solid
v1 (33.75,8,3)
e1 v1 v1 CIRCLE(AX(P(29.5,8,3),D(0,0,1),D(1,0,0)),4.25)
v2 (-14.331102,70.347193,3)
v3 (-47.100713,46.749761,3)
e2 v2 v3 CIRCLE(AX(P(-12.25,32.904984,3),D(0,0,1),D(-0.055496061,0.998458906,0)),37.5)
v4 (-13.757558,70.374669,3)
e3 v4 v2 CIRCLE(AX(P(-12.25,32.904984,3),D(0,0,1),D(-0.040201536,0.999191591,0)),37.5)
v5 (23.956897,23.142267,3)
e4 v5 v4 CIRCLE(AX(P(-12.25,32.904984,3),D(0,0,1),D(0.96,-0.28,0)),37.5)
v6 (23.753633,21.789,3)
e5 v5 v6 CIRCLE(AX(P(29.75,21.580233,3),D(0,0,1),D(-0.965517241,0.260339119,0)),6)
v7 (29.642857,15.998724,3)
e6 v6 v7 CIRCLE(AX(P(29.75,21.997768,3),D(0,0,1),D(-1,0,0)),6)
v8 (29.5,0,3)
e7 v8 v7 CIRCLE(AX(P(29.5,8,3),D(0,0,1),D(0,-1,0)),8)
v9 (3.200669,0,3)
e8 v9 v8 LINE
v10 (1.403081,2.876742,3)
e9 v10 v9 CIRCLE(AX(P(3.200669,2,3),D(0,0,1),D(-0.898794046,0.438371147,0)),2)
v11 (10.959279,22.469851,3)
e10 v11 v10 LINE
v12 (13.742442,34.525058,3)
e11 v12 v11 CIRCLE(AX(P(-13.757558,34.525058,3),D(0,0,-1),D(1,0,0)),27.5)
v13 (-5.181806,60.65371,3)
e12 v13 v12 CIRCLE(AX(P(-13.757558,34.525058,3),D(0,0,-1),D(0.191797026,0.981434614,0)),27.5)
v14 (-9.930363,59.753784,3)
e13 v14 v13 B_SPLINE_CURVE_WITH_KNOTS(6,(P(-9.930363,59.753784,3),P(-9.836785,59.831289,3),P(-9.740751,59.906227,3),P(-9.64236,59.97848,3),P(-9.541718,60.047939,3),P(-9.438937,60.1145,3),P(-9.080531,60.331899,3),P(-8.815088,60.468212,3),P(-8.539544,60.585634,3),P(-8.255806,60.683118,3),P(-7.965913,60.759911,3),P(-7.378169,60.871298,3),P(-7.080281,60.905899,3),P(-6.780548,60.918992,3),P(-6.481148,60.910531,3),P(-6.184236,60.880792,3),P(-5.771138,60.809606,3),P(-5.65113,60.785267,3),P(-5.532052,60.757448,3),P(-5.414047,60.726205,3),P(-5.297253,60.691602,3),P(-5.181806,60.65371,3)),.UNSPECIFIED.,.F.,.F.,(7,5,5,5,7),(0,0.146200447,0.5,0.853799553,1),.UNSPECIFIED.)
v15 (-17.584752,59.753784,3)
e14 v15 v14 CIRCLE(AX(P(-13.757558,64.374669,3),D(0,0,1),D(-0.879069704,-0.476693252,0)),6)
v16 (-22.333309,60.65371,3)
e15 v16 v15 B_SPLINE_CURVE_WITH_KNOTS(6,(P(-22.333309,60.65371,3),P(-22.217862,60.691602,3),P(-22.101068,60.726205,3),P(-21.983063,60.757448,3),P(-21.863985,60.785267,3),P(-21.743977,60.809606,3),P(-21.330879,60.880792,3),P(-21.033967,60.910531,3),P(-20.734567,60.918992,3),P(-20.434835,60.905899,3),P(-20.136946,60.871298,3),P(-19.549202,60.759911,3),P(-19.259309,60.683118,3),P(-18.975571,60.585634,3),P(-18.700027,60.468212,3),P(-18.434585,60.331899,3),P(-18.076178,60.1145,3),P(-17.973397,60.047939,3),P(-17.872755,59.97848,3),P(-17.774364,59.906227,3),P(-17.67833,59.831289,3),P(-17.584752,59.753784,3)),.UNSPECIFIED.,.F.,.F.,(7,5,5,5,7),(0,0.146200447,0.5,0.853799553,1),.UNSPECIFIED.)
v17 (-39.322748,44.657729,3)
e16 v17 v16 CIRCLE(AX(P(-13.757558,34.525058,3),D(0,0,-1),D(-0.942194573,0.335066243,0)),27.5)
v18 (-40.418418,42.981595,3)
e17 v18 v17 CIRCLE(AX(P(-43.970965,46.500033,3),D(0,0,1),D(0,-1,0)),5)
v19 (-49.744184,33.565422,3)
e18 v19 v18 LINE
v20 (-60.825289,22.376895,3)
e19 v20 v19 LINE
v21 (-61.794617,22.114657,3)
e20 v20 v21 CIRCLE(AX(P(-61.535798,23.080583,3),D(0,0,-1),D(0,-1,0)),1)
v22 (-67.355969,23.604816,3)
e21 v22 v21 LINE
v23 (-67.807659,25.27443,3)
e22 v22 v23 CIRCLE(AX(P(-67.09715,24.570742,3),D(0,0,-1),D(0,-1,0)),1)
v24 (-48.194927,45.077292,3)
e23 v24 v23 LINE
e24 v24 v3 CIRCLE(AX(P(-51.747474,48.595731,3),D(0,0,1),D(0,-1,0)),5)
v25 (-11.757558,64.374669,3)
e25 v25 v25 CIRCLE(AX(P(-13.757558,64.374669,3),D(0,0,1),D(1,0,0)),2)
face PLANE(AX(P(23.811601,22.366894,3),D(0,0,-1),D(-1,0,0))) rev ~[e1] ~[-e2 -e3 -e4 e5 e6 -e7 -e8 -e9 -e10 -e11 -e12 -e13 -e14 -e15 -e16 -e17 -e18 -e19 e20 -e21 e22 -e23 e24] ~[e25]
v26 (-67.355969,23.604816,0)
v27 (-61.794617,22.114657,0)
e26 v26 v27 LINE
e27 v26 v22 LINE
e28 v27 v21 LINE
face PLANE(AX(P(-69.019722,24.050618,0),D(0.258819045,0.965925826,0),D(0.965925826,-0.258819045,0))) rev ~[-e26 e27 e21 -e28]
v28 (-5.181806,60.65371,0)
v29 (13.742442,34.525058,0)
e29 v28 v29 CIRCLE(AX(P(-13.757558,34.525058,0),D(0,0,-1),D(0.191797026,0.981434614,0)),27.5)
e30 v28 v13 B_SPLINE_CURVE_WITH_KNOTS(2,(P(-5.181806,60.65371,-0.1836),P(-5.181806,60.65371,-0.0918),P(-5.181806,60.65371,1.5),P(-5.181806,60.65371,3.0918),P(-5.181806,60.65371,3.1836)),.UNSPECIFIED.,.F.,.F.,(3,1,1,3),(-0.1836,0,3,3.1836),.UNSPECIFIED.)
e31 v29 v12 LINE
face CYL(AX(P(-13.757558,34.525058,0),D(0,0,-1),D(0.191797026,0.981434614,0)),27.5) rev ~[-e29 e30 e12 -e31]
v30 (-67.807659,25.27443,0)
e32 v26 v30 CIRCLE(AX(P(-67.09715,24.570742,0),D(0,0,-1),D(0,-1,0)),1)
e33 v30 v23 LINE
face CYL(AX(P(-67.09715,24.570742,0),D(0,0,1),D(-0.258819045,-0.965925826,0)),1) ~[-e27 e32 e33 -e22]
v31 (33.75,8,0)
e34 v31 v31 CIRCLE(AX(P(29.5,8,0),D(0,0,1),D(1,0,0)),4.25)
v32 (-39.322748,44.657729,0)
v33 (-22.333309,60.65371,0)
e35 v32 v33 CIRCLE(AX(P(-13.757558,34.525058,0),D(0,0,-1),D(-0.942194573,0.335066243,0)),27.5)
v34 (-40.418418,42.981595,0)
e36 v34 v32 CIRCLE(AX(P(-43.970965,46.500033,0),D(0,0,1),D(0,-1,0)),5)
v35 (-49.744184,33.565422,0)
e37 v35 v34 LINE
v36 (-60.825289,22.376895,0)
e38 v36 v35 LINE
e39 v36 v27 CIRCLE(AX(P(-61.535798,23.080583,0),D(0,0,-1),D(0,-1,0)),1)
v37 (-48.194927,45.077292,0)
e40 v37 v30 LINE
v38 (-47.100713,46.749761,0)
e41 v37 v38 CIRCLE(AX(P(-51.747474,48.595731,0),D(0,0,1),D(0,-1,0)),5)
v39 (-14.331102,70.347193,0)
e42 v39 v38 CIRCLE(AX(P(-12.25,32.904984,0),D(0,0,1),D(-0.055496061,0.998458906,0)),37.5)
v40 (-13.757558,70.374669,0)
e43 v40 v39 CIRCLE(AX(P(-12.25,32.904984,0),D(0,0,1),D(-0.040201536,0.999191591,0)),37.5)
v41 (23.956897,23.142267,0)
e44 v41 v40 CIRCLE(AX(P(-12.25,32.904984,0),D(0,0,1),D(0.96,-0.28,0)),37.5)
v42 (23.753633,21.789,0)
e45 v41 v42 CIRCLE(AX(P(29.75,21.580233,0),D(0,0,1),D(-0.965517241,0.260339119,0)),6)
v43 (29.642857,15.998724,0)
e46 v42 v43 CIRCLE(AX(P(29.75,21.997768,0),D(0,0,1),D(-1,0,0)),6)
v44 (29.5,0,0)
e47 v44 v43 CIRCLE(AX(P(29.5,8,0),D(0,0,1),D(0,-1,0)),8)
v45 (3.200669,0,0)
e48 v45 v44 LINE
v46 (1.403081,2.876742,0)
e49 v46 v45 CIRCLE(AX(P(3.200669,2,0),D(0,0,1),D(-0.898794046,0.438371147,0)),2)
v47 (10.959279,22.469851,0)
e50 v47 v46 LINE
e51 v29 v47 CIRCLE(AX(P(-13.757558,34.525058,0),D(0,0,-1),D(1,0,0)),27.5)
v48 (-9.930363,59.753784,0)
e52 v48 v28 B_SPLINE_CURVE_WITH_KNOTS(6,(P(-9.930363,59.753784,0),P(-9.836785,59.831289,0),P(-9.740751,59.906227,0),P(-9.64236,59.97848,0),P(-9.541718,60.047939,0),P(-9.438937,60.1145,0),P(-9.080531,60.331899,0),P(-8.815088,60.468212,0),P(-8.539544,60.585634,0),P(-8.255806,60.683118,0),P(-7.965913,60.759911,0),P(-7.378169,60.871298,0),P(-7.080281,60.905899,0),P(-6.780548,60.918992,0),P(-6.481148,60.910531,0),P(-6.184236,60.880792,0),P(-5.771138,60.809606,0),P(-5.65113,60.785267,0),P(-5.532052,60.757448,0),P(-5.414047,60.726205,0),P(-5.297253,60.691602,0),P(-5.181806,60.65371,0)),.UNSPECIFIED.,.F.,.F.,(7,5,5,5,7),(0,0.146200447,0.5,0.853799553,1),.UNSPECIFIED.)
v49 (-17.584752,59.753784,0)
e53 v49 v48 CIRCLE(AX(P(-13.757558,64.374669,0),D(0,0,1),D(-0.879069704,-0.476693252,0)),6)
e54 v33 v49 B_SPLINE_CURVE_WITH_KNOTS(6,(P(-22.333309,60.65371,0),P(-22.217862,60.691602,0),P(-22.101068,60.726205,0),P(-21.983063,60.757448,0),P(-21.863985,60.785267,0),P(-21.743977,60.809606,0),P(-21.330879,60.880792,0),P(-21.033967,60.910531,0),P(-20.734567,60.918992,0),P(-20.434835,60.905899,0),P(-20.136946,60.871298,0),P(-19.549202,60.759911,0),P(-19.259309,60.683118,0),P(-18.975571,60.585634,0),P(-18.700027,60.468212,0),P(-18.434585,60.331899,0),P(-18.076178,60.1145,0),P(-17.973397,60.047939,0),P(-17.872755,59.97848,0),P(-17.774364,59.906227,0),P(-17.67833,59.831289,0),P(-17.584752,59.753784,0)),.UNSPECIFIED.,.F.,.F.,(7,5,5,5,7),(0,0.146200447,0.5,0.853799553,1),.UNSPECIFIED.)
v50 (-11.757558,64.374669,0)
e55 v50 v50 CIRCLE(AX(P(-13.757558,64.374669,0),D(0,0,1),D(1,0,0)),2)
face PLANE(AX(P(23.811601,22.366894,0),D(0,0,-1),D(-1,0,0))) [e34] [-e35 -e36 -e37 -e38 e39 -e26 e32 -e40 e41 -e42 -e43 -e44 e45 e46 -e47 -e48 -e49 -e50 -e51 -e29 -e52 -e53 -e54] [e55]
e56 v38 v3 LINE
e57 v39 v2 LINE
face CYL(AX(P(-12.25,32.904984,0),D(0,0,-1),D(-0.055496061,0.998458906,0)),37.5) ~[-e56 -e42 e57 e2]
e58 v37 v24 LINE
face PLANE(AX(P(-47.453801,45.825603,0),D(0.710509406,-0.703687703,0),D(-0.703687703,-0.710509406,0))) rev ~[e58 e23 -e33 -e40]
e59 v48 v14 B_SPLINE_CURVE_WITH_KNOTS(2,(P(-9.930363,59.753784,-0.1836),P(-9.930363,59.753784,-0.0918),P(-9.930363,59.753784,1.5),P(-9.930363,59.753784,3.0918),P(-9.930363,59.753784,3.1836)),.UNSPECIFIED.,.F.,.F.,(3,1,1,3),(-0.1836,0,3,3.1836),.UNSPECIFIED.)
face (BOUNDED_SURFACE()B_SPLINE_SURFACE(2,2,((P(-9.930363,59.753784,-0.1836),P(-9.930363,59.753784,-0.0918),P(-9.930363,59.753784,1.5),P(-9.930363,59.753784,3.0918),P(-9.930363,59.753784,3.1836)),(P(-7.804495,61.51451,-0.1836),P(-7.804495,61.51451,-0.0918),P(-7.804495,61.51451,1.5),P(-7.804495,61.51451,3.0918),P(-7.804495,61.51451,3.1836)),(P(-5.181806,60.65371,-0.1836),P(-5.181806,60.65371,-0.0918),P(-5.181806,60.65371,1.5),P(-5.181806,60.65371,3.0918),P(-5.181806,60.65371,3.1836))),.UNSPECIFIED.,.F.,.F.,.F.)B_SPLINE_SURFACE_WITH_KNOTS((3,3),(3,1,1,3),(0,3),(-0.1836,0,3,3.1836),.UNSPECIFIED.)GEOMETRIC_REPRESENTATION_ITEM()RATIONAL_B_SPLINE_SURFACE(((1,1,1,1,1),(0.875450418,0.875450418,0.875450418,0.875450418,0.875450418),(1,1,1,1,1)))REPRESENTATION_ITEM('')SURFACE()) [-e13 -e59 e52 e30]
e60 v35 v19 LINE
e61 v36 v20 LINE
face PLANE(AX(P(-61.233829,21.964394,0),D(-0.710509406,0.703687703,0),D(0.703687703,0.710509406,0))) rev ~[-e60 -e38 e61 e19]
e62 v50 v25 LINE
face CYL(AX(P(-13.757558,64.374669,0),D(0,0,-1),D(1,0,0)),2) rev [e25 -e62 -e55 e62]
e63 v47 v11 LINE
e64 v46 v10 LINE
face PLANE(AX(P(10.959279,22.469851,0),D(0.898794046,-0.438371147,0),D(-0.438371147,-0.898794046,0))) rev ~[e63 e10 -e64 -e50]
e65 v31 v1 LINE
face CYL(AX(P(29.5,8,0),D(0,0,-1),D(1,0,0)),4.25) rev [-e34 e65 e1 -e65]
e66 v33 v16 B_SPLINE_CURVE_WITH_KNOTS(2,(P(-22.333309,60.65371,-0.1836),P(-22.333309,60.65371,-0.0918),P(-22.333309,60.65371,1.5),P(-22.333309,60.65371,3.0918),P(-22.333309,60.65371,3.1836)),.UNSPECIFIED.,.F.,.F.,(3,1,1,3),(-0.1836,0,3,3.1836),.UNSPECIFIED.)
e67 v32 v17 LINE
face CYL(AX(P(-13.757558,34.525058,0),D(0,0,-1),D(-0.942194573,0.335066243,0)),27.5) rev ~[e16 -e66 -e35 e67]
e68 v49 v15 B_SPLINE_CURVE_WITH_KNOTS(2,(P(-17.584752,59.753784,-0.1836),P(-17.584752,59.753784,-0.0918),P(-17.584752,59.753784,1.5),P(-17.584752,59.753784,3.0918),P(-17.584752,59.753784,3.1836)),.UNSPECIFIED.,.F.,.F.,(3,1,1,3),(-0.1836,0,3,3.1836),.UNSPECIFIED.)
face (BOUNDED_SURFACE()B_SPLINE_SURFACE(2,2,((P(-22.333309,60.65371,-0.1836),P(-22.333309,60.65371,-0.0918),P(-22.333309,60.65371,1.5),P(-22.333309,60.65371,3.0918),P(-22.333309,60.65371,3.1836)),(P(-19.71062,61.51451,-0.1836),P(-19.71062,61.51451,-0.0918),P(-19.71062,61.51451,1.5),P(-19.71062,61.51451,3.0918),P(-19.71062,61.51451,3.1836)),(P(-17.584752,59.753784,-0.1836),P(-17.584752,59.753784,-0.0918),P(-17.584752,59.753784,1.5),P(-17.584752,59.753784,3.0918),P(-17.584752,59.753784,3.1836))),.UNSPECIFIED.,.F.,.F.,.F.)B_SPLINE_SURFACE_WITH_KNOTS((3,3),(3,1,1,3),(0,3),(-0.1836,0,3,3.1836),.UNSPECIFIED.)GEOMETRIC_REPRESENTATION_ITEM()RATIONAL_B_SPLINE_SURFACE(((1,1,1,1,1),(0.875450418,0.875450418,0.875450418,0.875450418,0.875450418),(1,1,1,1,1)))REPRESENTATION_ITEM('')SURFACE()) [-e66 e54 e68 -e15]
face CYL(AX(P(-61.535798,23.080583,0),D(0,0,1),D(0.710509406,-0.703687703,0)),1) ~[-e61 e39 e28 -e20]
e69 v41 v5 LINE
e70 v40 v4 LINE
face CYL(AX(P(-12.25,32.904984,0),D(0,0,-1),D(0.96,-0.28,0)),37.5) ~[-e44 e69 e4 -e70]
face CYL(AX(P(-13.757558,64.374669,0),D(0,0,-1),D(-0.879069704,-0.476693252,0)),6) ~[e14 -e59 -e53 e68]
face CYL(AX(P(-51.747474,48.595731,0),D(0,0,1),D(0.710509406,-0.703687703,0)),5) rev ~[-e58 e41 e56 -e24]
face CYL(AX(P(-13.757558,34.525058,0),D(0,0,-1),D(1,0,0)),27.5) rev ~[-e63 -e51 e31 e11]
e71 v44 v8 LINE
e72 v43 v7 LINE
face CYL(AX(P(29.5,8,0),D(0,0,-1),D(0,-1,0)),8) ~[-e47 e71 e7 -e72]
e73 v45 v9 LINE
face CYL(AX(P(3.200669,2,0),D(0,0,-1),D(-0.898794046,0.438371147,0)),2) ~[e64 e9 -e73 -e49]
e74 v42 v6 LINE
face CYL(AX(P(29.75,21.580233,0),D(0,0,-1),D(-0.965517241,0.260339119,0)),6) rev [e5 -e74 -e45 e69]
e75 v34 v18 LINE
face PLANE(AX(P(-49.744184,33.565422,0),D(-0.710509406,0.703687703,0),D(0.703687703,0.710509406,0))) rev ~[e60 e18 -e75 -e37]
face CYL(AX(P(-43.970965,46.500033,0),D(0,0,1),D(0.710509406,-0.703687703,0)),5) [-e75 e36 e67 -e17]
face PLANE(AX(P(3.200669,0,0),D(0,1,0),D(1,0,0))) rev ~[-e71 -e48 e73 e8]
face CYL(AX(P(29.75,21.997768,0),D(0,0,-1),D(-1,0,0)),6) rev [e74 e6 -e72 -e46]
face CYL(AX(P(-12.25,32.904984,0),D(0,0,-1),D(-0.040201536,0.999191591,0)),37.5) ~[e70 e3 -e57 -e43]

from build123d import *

# Parameters (mm, degrees)
F0_R        = 2
F0_R_2      = 4.25
F1_DEPTH    = 3
F2_R        = 5
F3_T1_DEPTH = 3
F4_R        = 1


# Not quite as in the source:
# - a fillet or chamfer that OpenCascade refuses, or shapes differently, is made with other operations: its cross-section is extruded or revolved along the edge and cut away or added


with BuildPart() as f1:
    # F0 (on Top) → F1 (new body)
    with BuildSketch(Plane.XY):
        with BuildLine():
            Line((-61.2338289806, 21.9643939736), (-49.74418384, 33.565422262))
            ThreePointArc((-49.74418384, 33.565422262), (-49.1122742467, 39.7914012722), (-47.4538011201, 45.8256030636))
            Line((-47.4538011201, 45.8256030636), (-69.0197217506, 24.0506176536))
            Line((-69.0197217506, 24.0506176536), (-61.2338289806, 21.9643939736))
        make_face()
        with BuildLine():
            ThreePointArc((-47.4538011201, 45.8256030636), (-49.1122742467, 39.7914012722), (-49.74418384, 33.565422262))
            Line((-49.74418384, 33.565422262), (-39.66790835, 43.7393793835))
            ThreePointArc((-39.66790835, 43.7393793835), (-31.7050161187, 55.3610537789), (-19.0319758246, 61.5145095676))
            ThreePointArc((-19.0319758246, 61.5145095676), (-19.0541360585, 67.1935796255), (-14.3311022775, 70.3471933782))
            ThreePointArc((-14.3311022775, 70.3471933782), (-34.5629581909, 63.0443589232), (-47.4538011201, 45.8256030636))
        make_face()
        with BuildLine():
            ThreePointArc((-13.7575576035, 70.3746690788), (-14.04438253, 70.3620290137), (-14.3311022775, 70.3471933782))
            ThreePointArc((-14.3311022775, 70.3471933782), (-19.0541360585, 67.1935796255), (-19.0319758246, 61.5145095676))
            ThreePointArc((-19.0319758246, 61.5145095676), (-13.7575576035, 62.0250576942), (-8.4831393824, 61.5145095676))
            ThreePointArc((-8.4831393824, 61.5145095676), (-7.941781244, 62.8992893525), (-7.7575576035, 64.3746690788))
            ThreePointArc((-7.7575576035, 64.3746690788), (-9.5149169164, 68.6173097659), (-13.7575576035, 70.3746690788))
        make_face()
        with Locations((-13.7575576035, 64.3746690788)):
            Circle(F0_R, mode=Mode.SUBTRACT)
        with BuildLine():
            ThreePointArc((-8.4831393824, 61.5145095676), (-13.7575576035, 62.0250576942), (-19.0319758246, 61.5145095676))
            ThreePointArc((-19.0319758246, 61.5145095676), (-13.7575576035, 58.3746690788), (-8.4831393824, 61.5145095676))
        make_face()
        with BuildLine():
            ThreePointArc((1.4030809655, 2.8767422936), (1.5045728658, 0.9401614715), (3.2006690581, 0))
            Line((3.2006690581, 0), (5.7364393854, 0))
            ThreePointArc((5.7364393854, 0), (16.9754981283, 9.4077450038), (23.75, 22.4049843981))
            ThreePointArc((23.75, 22.4049843981), (24.8731060123, 27.6016835392), (25.25, 32.9049843981))
            ThreePointArc((25.25, 32.9049843981), (13.7280348551, 59.9492389647), (-13.7575576035, 70.3746690788))
            ThreePointArc((-13.7575576035, 70.3746690788), (-9.5149169164, 68.6173097659), (-7.7575576035, 64.3746690788))
            ThreePointArc((-7.7575576035, 64.3746690788), (-7.941781244, 62.8992893525), (-8.4831393824, 61.5145095676))
            ThreePointArc((-8.4831393824, 61.5145095676), (7.4709197451, 52.0065264385), (13.7424423965, 34.5250576942))
            ThreePointArc((13.7424423965, 34.5250576942), (13.0376191781, 28.3389036997), (10.9592786697, 22.4698511575))
            Line((10.9592786697, 22.4698511575), (1.4030809655, 2.8767422936))
        make_face()
        with BuildLine():
            ThreePointArc((23.75, 22.4049843981), (16.9754981283, 9.4077450038), (5.7364393854, 0))
            Line((5.7364393854, 0), (29.5, 0))
            ThreePointArc((29.5, 0), (37.5, 8), (29.5, 16))
            Line((29.5, 16), (23.75, 16))
            Line((23.75, 16), (23.75, 22.4049843981))
        make_face()
        with Locations((29.5, 8)):
            Circle(F0_R_2, mode=Mode.SUBTRACT)
    extrude(amount=F1_DEPTH)

    # F2
    f2_edges = [f1.edges().sort_by_distance(p)[0] for p in [
        (-19.031976, 61.51451, 1.5),
        (-8.483139, 61.51451, 1.5),
        (-39.667908, 43.739379, 1.5),
        (-47.453801, 45.825603, 1.5),
    ]]
    fillet(f2_edges, radius=F2_R)

    # F3: fillet of radius 6 on 2 edges, made by hand

    # F3_s2 → F3_t1 (join)
    with BuildSketch(Plane.XY):
        with BuildLine():
            ThreePointArc((23.9568965517, 23.1422674559), (23.8019490297, 22.3680713423), (23.75, 21.5802327452))
            Line((23.75, 21.5802327452), (23.75, 22.4049843981))
            ThreePointArc((23.75, 22.4049843981), (23.8553302711, 22.773097801), (23.9568965517, 23.1422674559))
        make_face()
        with BuildLine():
            ThreePointArc((23.75, 21.9977676792), (25.4696462095, 17.7931783498), (29.6428571429, 15.9987243881))
            Line((29.6428571429, 15.9987243881), (29.6321428571, 15.398820059))
            ThreePointArc((29.6321428571, 15.398820059), (29.5, 15.4), (23.75, 15.4))
            Line((23.75, 15.4), (23.15, 16))
            Line((23.15, 16), (23.15, 21.9977676792))
            Line((23.15, 21.9977676792), (23.75, 21.9977676792))
        make_face()
    extrude(amount=F3_T1_DEPTH)

    # F4
    f4_edges = [f1.edges().sort_by_distance(p)[0] for p in [
        (-69.019722, 24.050618, 1.5),
        (-61.233829, 21.964394, 1.5),
    ]]
    fillet(f4_edges, radius=F4_R)


solid = f1.part
